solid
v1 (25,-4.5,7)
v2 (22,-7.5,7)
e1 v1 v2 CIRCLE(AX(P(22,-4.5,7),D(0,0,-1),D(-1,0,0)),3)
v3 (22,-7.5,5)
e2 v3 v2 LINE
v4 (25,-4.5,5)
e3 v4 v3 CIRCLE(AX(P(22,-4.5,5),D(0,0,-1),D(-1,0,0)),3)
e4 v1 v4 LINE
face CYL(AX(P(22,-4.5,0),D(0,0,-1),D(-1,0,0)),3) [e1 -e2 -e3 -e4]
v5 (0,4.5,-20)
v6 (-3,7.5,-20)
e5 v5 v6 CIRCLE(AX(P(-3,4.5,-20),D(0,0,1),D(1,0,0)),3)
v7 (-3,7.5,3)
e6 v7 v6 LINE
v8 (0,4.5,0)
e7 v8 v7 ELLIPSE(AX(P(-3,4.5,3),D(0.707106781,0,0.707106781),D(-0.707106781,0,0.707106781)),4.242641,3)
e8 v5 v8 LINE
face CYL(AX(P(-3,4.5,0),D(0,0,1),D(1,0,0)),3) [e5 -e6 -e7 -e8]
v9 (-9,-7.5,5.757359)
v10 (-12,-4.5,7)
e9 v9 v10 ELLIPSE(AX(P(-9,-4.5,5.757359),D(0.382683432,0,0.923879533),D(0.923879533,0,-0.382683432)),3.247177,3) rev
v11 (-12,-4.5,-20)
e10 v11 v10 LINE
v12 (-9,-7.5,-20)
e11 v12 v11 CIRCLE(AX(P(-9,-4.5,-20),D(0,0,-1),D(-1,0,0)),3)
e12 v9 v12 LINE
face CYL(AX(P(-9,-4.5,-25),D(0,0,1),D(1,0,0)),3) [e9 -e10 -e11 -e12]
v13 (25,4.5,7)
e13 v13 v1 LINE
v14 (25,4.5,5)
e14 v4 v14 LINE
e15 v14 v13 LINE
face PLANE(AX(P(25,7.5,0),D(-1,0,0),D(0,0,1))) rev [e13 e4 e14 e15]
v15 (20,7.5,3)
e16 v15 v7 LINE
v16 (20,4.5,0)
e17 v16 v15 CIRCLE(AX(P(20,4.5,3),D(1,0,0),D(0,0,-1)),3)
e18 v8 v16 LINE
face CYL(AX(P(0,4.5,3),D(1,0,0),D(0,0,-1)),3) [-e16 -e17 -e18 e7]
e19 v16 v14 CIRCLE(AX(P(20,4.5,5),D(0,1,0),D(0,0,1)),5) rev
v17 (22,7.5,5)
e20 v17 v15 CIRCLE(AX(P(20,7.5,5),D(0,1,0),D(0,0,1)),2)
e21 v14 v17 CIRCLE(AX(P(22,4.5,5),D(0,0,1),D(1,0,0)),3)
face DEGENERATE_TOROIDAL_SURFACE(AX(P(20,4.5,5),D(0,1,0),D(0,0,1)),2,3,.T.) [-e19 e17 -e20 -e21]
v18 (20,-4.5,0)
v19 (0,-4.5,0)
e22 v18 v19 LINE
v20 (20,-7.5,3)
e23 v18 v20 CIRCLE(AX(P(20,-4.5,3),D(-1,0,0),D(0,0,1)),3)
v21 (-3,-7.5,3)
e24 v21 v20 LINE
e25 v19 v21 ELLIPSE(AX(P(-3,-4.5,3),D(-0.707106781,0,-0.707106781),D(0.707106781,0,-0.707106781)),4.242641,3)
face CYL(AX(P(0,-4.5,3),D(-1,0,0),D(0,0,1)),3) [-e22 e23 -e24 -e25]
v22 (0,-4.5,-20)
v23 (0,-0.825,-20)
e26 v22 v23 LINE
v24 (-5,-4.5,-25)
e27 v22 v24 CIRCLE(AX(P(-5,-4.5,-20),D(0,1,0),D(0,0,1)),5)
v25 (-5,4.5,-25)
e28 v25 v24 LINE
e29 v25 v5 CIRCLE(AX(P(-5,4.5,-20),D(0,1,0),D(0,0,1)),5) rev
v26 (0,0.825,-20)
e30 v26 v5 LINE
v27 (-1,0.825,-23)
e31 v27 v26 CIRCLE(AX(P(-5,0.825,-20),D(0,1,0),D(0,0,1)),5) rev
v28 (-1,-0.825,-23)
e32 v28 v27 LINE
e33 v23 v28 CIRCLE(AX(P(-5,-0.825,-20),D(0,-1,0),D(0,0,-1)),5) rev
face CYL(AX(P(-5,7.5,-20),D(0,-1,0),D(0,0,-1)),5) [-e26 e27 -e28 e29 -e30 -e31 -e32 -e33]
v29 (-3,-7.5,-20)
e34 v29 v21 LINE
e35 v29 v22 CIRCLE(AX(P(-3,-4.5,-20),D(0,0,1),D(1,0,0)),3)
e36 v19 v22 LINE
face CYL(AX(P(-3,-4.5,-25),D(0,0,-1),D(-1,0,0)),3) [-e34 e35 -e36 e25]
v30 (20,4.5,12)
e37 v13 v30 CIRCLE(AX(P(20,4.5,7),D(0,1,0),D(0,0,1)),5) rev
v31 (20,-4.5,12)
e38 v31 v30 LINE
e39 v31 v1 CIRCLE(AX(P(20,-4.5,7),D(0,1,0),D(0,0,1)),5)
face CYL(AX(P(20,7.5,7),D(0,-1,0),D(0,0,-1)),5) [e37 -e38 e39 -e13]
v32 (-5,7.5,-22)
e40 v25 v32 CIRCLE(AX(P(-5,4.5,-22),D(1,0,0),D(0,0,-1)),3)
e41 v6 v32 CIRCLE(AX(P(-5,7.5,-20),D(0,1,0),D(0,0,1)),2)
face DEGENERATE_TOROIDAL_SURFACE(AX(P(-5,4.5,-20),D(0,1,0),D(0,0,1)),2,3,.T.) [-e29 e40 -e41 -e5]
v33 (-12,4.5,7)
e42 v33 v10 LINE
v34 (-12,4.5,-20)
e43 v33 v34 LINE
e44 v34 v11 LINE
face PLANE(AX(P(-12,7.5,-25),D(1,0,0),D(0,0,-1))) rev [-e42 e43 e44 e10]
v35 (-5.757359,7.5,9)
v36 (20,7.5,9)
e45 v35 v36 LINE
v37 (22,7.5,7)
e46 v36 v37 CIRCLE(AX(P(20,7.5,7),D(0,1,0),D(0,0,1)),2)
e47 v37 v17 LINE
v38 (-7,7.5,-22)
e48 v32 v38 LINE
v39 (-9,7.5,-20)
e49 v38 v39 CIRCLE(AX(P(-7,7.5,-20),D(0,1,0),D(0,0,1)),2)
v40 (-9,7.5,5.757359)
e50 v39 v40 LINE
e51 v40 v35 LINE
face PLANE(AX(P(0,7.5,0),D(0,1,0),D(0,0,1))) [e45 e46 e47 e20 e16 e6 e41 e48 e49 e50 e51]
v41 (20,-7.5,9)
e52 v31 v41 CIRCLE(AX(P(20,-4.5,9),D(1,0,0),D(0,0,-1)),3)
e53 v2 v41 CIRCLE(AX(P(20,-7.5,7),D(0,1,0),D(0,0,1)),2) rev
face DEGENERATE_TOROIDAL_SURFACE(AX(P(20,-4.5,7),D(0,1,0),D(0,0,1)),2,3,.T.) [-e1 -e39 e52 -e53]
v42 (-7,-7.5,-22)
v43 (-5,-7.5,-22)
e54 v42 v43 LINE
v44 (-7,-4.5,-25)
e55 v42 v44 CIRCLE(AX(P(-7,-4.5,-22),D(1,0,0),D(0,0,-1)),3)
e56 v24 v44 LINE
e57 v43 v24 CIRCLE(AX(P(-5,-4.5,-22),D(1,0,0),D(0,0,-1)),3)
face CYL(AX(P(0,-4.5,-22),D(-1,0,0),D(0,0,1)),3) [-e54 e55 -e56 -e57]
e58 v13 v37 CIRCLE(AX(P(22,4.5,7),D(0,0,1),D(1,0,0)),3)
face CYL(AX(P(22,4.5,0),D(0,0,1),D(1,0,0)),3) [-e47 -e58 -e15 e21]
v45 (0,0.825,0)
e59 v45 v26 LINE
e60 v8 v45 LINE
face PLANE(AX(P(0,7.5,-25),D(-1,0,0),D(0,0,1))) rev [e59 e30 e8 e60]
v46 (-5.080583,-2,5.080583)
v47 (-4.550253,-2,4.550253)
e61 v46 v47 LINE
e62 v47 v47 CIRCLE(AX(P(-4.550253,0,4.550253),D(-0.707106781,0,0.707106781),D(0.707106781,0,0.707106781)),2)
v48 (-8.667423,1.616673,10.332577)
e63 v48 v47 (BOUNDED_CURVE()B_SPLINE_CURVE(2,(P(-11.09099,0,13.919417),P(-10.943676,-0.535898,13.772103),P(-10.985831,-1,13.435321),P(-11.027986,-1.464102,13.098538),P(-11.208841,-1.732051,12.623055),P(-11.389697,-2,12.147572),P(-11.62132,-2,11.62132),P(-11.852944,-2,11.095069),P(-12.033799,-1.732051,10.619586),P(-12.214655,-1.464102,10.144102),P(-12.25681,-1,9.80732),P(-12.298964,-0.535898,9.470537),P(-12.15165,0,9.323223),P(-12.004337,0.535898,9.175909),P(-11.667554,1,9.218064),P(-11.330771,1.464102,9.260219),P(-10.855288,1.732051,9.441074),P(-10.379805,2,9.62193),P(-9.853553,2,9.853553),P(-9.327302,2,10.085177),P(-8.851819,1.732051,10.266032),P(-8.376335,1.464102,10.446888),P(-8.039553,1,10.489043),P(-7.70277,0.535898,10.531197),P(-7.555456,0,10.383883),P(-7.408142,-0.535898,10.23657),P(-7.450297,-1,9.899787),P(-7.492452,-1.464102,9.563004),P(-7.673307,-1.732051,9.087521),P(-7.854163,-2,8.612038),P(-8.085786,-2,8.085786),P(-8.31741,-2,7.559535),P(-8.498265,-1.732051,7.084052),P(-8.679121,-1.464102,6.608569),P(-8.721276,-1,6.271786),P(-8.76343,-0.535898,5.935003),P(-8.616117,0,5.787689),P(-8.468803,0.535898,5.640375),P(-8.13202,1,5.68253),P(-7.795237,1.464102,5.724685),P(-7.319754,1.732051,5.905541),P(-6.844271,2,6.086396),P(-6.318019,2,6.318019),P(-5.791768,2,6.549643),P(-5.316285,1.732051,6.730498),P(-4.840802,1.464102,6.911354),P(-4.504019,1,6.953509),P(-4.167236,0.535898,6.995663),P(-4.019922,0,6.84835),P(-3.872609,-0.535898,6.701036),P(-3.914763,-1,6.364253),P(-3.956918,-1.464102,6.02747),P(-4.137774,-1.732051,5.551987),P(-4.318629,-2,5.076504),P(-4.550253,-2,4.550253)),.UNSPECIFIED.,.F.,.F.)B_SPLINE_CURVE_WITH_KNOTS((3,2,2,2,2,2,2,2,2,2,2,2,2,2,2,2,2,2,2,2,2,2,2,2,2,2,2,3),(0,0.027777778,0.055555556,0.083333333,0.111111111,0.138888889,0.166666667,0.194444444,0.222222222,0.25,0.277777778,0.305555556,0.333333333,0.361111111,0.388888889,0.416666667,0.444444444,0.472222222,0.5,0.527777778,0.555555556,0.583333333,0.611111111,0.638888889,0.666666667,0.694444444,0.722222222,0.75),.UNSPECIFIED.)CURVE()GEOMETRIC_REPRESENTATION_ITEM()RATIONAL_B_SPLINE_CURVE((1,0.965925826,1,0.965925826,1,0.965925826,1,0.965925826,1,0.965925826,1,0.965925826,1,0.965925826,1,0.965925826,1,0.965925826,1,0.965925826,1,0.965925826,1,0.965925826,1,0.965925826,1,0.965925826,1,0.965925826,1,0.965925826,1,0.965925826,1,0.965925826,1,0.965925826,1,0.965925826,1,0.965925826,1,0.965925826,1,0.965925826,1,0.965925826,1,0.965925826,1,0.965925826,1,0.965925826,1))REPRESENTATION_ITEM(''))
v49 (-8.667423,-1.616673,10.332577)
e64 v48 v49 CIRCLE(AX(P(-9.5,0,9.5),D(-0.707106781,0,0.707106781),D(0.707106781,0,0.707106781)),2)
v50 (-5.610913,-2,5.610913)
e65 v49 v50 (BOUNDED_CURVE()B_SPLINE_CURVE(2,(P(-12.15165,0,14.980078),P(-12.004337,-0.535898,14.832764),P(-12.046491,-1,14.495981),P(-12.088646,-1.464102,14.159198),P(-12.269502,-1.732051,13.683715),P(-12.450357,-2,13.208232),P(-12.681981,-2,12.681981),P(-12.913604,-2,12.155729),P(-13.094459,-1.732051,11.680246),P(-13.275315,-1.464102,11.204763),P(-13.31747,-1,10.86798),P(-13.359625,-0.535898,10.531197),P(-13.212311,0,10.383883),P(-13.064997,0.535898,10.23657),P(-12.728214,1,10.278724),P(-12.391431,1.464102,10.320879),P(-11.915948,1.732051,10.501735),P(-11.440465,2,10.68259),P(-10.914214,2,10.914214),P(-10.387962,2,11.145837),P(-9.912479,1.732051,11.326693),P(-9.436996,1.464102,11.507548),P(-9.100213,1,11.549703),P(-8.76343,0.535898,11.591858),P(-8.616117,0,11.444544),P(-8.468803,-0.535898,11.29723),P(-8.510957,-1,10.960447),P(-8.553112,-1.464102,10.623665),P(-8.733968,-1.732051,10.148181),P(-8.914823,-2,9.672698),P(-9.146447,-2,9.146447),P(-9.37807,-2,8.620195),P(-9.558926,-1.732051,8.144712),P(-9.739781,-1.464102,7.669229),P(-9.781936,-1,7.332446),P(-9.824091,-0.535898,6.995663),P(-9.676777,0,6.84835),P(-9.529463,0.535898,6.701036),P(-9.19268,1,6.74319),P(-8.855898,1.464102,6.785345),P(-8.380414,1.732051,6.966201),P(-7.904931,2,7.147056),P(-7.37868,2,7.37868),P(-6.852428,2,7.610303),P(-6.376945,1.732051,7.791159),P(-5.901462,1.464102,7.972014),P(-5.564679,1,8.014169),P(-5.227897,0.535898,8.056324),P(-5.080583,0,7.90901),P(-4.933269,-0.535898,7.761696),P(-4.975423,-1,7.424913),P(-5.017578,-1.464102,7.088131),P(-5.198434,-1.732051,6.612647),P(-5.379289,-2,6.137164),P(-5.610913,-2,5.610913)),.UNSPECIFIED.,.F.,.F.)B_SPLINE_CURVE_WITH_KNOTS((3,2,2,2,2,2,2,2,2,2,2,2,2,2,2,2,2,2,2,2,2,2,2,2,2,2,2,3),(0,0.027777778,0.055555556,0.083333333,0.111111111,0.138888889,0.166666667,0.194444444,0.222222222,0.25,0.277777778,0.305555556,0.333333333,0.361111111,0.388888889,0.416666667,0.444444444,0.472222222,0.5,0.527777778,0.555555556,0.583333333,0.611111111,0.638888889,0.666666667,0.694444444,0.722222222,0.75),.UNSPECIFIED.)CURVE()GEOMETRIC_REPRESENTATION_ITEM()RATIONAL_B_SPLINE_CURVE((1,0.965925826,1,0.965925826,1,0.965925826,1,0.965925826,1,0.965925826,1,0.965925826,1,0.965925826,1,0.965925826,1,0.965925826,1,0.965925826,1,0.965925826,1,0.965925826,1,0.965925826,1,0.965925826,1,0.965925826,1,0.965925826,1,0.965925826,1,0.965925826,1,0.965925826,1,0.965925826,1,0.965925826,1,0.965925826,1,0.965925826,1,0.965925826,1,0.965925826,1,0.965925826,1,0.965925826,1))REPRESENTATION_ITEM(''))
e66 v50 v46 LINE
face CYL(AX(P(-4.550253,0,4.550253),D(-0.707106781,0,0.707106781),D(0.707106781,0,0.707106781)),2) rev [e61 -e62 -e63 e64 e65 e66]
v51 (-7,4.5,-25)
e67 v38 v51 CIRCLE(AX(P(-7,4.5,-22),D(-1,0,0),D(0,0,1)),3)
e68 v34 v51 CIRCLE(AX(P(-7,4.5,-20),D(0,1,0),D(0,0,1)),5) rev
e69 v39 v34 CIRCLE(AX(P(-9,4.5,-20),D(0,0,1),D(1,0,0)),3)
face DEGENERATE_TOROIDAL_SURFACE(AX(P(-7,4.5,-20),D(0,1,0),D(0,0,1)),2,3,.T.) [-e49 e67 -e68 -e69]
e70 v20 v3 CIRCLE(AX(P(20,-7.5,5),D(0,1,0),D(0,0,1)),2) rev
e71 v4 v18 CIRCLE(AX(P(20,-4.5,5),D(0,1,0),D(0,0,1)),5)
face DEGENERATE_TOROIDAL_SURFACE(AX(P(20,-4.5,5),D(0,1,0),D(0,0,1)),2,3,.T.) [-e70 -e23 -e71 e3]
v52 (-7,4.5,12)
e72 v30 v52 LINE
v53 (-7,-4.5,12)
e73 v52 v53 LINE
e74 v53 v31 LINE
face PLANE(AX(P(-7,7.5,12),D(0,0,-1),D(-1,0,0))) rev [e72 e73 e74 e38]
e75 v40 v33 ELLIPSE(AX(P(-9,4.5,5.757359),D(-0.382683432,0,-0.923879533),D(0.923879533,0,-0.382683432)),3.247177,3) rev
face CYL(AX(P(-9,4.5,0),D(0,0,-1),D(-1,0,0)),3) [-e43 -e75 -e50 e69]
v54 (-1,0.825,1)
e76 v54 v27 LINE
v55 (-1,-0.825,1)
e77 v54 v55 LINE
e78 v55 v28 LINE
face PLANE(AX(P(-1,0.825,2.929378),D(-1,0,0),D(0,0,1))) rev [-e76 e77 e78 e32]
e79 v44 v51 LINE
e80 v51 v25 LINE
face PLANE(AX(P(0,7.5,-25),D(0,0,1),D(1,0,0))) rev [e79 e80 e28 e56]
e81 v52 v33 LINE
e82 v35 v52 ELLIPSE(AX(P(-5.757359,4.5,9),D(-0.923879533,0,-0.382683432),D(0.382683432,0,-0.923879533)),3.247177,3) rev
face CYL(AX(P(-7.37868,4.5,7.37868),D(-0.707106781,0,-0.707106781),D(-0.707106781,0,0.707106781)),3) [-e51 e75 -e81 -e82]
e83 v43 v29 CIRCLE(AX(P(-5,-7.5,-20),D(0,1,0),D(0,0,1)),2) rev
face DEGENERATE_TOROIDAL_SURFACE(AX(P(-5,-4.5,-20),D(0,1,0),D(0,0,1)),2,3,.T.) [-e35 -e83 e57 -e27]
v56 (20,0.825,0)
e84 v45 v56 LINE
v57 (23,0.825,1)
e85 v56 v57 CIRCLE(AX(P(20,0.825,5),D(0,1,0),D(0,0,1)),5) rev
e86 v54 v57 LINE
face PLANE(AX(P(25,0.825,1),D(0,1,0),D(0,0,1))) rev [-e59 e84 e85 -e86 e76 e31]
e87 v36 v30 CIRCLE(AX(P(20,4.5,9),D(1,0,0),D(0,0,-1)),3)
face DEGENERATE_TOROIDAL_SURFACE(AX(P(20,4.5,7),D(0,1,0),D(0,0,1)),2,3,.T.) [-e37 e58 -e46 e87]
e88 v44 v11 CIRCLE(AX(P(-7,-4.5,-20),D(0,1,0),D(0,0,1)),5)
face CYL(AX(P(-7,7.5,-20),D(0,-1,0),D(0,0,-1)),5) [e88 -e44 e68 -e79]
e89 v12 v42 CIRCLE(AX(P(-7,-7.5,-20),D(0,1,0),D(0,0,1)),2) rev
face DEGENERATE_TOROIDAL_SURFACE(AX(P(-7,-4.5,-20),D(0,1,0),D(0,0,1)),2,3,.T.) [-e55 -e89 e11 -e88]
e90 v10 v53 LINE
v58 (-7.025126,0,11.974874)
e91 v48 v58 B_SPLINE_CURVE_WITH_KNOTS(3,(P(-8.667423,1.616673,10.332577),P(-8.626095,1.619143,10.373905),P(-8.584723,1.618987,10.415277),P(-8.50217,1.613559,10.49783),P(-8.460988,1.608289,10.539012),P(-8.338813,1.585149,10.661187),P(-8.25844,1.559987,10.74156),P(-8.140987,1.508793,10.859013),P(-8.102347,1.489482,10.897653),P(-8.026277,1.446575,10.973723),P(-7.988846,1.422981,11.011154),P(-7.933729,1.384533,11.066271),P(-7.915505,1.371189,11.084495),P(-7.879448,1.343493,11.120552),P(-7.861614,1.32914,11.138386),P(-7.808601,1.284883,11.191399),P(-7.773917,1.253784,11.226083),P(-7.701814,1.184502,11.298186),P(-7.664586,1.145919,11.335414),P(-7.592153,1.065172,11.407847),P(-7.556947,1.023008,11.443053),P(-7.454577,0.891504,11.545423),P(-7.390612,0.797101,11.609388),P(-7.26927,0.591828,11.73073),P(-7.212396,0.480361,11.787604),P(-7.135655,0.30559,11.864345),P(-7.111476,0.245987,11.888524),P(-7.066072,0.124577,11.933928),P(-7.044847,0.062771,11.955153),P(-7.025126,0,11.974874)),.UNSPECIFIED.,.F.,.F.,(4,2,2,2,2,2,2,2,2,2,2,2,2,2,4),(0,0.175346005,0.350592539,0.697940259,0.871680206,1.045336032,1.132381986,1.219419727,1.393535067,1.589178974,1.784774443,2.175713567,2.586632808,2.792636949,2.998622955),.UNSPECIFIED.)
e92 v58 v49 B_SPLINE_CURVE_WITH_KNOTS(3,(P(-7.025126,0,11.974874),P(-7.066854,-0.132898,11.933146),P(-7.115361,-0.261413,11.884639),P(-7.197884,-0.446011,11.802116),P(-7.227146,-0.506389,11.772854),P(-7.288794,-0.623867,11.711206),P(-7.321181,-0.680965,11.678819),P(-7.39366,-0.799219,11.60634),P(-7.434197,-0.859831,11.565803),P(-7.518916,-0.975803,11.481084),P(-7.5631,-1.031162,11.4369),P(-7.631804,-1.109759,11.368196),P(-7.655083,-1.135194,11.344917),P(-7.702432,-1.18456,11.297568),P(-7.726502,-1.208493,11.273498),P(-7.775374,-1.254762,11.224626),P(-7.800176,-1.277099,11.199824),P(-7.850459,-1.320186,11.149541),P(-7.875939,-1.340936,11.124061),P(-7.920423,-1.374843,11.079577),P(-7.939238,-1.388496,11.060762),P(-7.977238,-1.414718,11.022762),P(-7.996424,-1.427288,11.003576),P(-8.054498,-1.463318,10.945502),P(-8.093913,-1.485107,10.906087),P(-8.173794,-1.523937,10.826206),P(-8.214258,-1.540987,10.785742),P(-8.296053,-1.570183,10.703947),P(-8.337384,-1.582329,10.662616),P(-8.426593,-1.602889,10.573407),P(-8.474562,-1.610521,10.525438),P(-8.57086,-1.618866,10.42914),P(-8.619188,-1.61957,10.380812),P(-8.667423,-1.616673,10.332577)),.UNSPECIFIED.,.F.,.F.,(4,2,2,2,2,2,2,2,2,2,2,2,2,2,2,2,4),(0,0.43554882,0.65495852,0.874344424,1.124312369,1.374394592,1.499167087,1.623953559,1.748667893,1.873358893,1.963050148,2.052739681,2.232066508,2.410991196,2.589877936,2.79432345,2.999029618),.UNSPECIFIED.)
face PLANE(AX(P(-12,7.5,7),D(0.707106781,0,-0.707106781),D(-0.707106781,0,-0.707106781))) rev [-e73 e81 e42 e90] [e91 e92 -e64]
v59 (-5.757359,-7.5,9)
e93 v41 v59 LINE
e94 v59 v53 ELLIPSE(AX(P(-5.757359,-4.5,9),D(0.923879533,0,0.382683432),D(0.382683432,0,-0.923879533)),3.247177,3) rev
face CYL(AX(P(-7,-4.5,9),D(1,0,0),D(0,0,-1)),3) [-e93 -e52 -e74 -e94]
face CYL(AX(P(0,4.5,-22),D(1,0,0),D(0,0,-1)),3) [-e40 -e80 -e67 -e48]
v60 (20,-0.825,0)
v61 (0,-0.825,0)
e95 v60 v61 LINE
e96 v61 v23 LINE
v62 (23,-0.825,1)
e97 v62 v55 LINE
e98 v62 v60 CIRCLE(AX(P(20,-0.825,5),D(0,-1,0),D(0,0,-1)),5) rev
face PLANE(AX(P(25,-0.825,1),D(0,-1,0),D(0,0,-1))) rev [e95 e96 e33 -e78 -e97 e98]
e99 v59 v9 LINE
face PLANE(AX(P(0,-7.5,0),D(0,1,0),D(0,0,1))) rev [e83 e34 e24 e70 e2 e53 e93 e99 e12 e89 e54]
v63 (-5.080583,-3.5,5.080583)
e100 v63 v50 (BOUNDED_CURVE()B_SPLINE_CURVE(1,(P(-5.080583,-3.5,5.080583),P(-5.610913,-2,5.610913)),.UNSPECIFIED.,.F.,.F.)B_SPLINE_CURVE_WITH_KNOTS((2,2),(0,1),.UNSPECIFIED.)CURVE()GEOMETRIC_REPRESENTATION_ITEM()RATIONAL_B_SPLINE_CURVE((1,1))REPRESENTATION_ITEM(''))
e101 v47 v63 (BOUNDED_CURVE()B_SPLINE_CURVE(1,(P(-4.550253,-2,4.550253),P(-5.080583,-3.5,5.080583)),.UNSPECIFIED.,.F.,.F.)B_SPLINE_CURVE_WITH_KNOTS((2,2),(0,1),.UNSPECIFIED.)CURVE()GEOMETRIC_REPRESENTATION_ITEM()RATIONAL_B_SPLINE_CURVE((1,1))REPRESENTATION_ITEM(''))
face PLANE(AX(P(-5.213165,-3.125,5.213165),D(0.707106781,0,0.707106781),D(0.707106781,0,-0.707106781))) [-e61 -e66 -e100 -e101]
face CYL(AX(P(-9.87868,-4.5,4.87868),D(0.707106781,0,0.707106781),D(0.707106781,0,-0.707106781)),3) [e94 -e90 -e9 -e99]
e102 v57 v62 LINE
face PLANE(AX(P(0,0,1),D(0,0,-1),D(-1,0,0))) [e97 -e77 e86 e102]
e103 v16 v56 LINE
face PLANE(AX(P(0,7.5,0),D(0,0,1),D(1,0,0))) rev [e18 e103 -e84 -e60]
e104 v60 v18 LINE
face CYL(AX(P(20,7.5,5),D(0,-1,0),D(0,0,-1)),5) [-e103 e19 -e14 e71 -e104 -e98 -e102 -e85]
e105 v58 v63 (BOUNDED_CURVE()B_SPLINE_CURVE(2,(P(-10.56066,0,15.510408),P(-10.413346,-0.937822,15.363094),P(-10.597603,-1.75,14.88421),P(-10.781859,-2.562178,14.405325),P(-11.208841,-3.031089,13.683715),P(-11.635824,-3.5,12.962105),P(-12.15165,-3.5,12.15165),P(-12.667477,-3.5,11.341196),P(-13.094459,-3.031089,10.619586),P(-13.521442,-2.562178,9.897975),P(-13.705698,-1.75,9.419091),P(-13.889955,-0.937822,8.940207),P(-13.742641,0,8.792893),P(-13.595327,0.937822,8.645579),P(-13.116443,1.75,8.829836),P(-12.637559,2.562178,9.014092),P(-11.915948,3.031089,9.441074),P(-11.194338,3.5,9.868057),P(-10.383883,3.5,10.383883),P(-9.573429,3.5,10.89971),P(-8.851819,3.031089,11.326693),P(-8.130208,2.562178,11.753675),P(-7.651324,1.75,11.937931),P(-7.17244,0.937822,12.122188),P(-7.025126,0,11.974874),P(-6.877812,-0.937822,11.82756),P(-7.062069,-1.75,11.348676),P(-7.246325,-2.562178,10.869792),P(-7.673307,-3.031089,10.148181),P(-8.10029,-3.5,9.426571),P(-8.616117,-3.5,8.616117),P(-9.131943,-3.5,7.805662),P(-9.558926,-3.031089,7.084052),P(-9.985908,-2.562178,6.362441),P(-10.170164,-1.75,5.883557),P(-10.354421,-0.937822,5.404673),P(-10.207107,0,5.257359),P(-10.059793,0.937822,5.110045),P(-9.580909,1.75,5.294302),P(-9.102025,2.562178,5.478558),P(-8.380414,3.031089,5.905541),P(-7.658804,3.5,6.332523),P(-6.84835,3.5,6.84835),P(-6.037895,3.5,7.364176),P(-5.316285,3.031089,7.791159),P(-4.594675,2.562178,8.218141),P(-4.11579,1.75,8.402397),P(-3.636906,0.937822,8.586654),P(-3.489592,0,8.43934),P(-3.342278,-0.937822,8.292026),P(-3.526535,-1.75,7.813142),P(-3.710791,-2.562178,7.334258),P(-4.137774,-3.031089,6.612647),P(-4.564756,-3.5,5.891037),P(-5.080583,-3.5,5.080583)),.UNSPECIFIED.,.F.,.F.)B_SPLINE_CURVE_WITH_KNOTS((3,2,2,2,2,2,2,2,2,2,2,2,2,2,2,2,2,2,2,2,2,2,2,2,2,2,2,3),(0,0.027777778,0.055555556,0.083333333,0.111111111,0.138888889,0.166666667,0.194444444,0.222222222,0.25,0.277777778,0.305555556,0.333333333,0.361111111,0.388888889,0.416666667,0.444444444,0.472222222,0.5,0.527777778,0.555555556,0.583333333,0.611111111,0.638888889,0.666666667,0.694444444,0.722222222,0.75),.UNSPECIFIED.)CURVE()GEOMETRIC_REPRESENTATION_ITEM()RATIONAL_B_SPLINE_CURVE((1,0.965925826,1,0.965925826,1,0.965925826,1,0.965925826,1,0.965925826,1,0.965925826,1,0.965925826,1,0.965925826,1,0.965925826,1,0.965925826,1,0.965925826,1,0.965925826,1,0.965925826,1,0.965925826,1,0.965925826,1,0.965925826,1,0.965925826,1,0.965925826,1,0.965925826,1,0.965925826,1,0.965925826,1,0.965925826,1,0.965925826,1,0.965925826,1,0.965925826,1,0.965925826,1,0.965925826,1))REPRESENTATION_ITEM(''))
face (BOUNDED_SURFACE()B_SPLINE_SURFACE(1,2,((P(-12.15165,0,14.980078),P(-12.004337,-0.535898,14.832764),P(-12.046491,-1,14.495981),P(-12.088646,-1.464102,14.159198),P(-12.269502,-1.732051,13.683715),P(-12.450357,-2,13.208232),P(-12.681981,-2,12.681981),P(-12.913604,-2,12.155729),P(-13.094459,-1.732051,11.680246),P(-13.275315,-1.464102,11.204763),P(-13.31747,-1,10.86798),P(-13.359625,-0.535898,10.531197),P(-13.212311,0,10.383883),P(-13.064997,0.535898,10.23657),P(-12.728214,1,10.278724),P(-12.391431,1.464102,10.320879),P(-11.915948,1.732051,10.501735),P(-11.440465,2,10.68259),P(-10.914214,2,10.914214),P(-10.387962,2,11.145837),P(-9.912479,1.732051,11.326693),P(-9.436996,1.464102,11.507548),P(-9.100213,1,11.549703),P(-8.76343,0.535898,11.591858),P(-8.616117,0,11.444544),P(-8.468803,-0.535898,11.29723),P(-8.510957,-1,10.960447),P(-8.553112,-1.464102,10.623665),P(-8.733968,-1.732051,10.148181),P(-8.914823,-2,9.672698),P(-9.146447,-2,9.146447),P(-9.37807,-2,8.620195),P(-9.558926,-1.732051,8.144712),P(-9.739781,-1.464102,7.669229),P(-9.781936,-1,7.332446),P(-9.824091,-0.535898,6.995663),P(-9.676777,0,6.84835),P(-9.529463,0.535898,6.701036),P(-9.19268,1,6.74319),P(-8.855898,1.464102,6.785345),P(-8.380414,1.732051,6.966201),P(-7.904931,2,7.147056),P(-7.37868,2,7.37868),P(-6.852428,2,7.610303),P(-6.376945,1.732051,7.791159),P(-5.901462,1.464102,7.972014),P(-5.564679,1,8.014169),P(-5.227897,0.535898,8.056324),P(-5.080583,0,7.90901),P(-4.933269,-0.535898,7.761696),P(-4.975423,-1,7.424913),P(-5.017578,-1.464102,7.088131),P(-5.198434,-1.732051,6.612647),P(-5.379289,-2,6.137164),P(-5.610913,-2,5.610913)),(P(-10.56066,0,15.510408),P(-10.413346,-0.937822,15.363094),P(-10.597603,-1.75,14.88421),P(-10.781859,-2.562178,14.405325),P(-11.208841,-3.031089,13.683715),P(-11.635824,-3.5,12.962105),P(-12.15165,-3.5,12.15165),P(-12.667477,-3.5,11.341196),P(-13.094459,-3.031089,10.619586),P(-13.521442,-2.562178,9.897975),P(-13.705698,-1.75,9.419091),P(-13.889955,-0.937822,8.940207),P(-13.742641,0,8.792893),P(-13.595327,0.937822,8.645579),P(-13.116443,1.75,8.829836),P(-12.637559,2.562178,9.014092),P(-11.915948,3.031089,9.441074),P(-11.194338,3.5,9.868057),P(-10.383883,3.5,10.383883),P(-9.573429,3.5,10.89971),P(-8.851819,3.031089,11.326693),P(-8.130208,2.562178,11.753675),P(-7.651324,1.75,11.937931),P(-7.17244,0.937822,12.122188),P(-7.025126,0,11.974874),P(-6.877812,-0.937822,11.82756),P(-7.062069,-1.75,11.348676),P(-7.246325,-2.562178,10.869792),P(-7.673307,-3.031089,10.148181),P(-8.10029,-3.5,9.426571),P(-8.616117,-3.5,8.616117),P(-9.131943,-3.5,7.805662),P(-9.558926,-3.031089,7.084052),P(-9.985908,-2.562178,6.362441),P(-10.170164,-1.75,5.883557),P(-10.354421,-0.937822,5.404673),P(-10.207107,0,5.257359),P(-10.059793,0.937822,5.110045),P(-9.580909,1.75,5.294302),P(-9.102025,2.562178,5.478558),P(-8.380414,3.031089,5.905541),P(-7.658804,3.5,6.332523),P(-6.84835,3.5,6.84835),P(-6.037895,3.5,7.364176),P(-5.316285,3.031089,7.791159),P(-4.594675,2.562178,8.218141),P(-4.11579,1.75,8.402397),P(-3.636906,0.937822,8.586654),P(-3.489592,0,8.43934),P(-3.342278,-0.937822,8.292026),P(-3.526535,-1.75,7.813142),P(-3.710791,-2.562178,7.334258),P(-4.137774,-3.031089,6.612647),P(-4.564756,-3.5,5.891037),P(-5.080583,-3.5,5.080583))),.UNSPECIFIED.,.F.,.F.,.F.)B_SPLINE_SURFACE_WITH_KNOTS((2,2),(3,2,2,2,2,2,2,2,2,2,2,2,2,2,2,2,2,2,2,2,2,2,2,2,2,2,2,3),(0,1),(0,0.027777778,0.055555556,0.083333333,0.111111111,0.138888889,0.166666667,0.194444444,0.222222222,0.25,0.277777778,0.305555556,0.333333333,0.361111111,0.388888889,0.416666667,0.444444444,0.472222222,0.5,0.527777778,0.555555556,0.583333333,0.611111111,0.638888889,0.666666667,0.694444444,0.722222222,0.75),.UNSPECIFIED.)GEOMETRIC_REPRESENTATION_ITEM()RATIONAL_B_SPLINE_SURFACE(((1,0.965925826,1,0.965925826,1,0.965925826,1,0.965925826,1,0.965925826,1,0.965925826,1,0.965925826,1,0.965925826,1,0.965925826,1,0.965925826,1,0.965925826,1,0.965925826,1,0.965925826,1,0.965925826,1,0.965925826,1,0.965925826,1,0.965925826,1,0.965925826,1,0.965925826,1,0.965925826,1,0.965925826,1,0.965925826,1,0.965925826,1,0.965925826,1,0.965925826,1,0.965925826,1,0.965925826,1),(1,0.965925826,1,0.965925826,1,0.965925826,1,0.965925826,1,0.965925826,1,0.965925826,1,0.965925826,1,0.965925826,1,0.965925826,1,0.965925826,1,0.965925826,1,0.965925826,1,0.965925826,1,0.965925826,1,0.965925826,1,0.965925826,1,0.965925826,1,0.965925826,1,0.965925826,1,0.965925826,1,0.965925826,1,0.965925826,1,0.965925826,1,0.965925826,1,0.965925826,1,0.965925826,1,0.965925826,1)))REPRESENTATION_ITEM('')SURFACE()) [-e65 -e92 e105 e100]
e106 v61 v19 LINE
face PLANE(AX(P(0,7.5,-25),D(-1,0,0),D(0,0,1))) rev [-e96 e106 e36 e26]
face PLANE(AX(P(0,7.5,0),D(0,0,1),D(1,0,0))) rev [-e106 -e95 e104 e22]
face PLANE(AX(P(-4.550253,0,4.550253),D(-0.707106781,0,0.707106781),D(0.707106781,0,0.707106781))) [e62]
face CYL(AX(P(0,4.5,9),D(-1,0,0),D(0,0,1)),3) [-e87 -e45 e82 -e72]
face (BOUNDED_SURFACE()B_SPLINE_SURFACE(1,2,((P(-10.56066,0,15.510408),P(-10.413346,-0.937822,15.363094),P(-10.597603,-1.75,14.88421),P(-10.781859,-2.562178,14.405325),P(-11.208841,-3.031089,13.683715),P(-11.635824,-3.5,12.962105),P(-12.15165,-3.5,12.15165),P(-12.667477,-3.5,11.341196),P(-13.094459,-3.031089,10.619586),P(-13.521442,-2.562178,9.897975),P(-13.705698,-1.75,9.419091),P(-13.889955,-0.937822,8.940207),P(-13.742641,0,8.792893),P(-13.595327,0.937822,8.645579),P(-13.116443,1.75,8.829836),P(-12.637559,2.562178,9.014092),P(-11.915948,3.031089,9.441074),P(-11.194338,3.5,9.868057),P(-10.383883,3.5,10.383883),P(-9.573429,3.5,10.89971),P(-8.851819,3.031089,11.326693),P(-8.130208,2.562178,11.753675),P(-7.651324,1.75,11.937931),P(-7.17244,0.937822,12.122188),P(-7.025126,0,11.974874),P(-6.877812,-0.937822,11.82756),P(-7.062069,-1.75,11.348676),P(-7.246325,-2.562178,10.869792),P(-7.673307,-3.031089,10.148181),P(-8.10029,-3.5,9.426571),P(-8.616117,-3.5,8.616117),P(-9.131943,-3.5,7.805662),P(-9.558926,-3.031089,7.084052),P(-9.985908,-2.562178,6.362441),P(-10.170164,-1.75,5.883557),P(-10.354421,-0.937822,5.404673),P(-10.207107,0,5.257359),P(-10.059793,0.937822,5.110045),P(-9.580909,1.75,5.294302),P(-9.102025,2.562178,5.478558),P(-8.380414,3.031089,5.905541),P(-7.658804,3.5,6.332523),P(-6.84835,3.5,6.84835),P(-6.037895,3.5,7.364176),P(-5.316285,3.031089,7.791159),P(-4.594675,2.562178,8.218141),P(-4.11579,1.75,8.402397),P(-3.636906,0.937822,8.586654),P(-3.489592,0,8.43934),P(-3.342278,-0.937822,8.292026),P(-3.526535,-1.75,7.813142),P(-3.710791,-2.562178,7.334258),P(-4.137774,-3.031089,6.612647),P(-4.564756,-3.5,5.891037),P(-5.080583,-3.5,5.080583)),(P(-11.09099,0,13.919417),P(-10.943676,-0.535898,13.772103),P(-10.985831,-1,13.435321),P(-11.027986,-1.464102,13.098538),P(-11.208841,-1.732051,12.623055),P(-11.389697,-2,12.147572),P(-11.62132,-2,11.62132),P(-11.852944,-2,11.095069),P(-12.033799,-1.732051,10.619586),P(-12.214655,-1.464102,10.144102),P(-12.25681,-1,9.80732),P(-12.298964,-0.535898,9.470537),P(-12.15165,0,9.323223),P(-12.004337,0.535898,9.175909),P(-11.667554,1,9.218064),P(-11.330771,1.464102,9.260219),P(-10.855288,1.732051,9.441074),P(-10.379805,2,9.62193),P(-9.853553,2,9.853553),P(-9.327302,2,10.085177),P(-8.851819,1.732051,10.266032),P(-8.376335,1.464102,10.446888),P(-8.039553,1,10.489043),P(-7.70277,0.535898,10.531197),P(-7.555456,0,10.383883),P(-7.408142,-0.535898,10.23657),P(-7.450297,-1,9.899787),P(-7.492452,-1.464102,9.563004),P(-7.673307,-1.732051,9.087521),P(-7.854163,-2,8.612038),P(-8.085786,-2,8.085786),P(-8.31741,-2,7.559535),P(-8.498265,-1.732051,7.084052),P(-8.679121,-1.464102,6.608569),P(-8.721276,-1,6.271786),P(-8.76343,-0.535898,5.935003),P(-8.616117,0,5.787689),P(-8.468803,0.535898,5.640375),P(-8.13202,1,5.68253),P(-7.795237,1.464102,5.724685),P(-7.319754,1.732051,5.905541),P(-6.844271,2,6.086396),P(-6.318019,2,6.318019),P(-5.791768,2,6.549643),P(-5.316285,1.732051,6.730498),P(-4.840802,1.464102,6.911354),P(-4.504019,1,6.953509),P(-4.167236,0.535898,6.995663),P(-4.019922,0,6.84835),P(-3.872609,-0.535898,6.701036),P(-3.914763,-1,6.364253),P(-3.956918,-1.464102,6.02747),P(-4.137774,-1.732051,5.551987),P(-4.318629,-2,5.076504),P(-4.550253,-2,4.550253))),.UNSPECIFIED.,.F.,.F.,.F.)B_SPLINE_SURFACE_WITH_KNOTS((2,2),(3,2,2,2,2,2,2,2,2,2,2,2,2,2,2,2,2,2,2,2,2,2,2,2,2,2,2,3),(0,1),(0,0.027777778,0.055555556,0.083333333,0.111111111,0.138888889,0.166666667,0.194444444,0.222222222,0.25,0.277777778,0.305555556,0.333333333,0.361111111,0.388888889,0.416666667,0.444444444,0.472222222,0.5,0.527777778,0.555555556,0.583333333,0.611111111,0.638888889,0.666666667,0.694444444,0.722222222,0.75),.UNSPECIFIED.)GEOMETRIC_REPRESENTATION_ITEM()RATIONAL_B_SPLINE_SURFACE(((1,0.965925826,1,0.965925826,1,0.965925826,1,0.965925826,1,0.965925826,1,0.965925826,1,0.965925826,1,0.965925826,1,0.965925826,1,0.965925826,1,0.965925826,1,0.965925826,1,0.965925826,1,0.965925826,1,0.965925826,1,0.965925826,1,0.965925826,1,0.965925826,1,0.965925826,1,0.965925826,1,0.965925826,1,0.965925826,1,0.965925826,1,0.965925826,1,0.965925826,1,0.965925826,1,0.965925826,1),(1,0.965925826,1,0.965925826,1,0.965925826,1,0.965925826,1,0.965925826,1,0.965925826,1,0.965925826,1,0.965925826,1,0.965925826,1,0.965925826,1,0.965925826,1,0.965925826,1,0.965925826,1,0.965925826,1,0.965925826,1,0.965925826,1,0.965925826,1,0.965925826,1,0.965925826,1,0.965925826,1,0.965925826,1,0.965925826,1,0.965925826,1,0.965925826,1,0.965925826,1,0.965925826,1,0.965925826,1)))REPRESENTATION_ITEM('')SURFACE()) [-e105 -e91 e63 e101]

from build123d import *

# Parameters (mm, degrees)
BOSS_EXTRUDE1_DEPTH = 7.5
SKETCH3_W           = 25
SKETCH3_H           = 1.65
CUT_EXTRUDE1_DEPTH  = 1
SKETCH4_W           = 1
SKETCH4_H           = 1.65
CUT_EXTRUDE2_DEPTH  = 26
FILLET1_R           = 5
FILLET2_R           = 3
SKETCH5_R           = 2
CUT_EXTRUDE3_DEPTH  = 7
CUT_SWEEP1_PITCH    = 5


with BuildPart() as part:
    # Sketch1 → Boss-Extrude1 (new, symmetric)
    with BuildSketch(Plane(origin=(0, 0, 0), x_dir=(1, 0, 0), z_dir=(0, 1, 0))):
        Polygon((0, 25), (0, 0), (25, 0), (25, -12), (-7, -12), (-12, -7), (-12, 25), align=None)
    extrude(amount=BOSS_EXTRUDE1_DEPTH, both=True)

    # Sketch3 → Cut-Extrude1 (cut)
    with BuildSketch(Plane(origin=(0, 0, 0), x_dir=(-1, 0, 0), z_dir=(0, 0, -1))):
        with Locations((-12.5, 0)):
            Rectangle(SKETCH3_W, SKETCH3_H)
    extrude(amount=-CUT_EXTRUDE1_DEPTH, mode=Mode.SUBTRACT)

    # Sketch4 → Cut-Extrude2 (cut)
    with BuildSketch(Plane(origin=(0, 0, -25), x_dir=(-1, 0, 0), z_dir=(0, 0, -1))):
        with Locations((0.5, 0)):
            Rectangle(SKETCH4_W, SKETCH4_H)
    extrude(amount=-CUT_EXTRUDE2_DEPTH, mode=Mode.SUBTRACT)

    # Fillet1
    fillet1_edges = [part.edges().sort_by_distance(p)[0] for p in [
        (25, -4.1625, 0),
        (25, 0, 12),
        (0, 4.1625, -25),
        (-12, 0, -25),
    ]]
    fillet(fillet1_edges, radius=FILLET1_R - 0.0001)  # a hair under: the kernel refuses the full size

    # Fillet2
    fillet2_edges = [part.edges().sort_by_distance(p)[0] for p in [
        (-9.5, 7.5, 9.5),
        (6.50005, 7.5, 12),
        (0, 7.5, -10.00005),
        (10.00005, -7.5, 0),
        (-6, -7.5, -25),
        (25, -7.5, 6),
        (-12, -7.5, -6.50005),
        (-10.535563195, -7.5, -23.535563195),
        (-1.464436908, -7.5, -23.535563298),
        (23.535563195, -7.5, 10.535563195),
        (23.535563195, -7.5, 1.464436805),
        (25, 7.5, 6),
        (-6, 7.5, -25),
        (-12, 7.5, -6.50005),
        (10.00005, 7.5, 0),
        (-10.535563195, 7.5, -23.535563195),
        (-1.464436805, 7.5, -23.535563195),
        (23.535563195, 7.5, 10.535563195),
        (23.535563195, 7.5, 1.464436805),
        (0, -7.5, -10.000050146),
        (6.50005, -7.5, 12),
        (-9.5, -7.5, 9.5),
    ]]
    fillet(fillet2_edges, radius=FILLET2_R)

    # Sketch5 → Cut-Extrude3 (cut)
    with BuildSketch(Plane(origin=(-9.5, 0, 9.5), x_dir=(0.7071067811865475, 0, 0.7071067811865477), z_dir=(-0.7071067811865477, 0, 0.7071067811865475))):
        Circle(SKETCH5_R)
    extrude(amount=-CUT_EXTRUDE3_DEPTH, mode=Mode.SUBTRACT)

    # Cut-Sweep1: arcs per turn and ends read off the stored shape
    # Cut-Sweep1: the profile of Sketch8 screwed along a right-hand helix through 2.25 turns, 12 arcs to a turn; built about Z, then put on its axis
    cut_sweep1_z = Axis((0, 0, 0), (0, 0, 1))
    cut_sweep1_corners = [(2, 0, -4.25), (3.5, 0, -5), (2, 0, -5.75), (2, 0, -5)]
    with BuildLine(mode=Mode.PRIVATE) as cut_sweep1_profile:
        Line(cut_sweep1_corners[0], cut_sweep1_corners[1])
        Line(cut_sweep1_corners[1], cut_sweep1_corners[2])
        Line(cut_sweep1_corners[2], cut_sweep1_corners[3])
        Line(cut_sweep1_corners[3], cut_sweep1_corners[0])
    cut_sweep1_cap = Face(cut_sweep1_profile.wire())
    cut_sweep1_turn_angles = [0, 15, 30, 45, 60, 75, 90, 105, 120, 135, 150, 165, 180, 195, 210, 225, 240, 255, 270, 285, 300, 315, 330, 345, 360]
    cut_sweep1_turn_weights = [1, 0.9659258262890683, 1, 0.9659258262890683, 1, 0.9659258262890683, 1, 0.9659258262890683, 1, 0.9659258262890683, 1, 0.9659258262890683, 1, 0.9659258262890683, 1, 0.9659258262890683, 1, 0.9659258262890683, 1, 0.9659258262890683, 1, 0.9659258262890683, 1, 0.9659258262890683, 1]
    cut_sweep1_turn_rails = [Edge.make_bspline([Vector(p[0], p[1], 0).rotate(cut_sweep1_z, cut_sweep1_turn_angles[k]) / cut_sweep1_turn_weights[k] + Vector(0, 0, p[2] + CUT_SWEEP1_PITCH * cut_sweep1_turn_angles[k] / 360) for k in range(25)], [0, 0, 0, 1, 1, 2, 2, 3, 3, 4, 4, 5, 5, 6, 6, 7, 7, 8, 8, 9, 9, 10, 10, 11, 11, 12, 12, 12], 2, cut_sweep1_turn_weights) for p in cut_sweep1_corners]
    cut_sweep1_turn_sides = [Face.make_surface_from_curves(cut_sweep1_turn_rails[p[0]], cut_sweep1_turn_rails[p[1]]) for p in [(0, 1), (1, 2), (2, 3), (3, 0)]]
    cut_sweep1_last_angles = [720, 735, 750, 765, 780, 795, 810]
    cut_sweep1_last_weights = [1, 0.9659258262890683, 1, 0.9659258262890683, 1, 0.9659258262890683, 1]
    cut_sweep1_last_rails = [Edge.make_bspline([Vector(p[0], p[1], 0).rotate(cut_sweep1_z, cut_sweep1_last_angles[k]) / cut_sweep1_last_weights[k] + Vector(0, 0, p[2] + CUT_SWEEP1_PITCH * cut_sweep1_last_angles[k] / 360) for k in range(7)], [0, 0, 0, 1, 1, 2, 2, 3, 3, 3], 2, cut_sweep1_last_weights) for p in cut_sweep1_corners]
    cut_sweep1_last_sides = [Face.make_surface_from_curves(cut_sweep1_last_rails[p[0]], cut_sweep1_last_rails[p[1]]) for p in [(0, 1), (1, 2), (2, 3), (3, 0)]]
    cut_sweep1 = Plane(origin=(-9.5, 0, 9.5), x_dir=(0.7071067811865475, 0, 0.7071067811865477), z_dir=(0.7071067811865477, 0, -0.7071067811865475)) * Solid(Shell([*[p.moved(Location((0, 0, CUT_SWEEP1_PITCH * i))) for i in range(2) for p in cut_sweep1_turn_sides], *cut_sweep1_last_sides, cut_sweep1_cap, cut_sweep1_cap.rotate(cut_sweep1_z, 810).moved(Location((0, 0, CUT_SWEEP1_PITCH * 810 / 360)))]))
    add(cut_sweep1, mode=Mode.SUBTRACT)


solid = part.part
